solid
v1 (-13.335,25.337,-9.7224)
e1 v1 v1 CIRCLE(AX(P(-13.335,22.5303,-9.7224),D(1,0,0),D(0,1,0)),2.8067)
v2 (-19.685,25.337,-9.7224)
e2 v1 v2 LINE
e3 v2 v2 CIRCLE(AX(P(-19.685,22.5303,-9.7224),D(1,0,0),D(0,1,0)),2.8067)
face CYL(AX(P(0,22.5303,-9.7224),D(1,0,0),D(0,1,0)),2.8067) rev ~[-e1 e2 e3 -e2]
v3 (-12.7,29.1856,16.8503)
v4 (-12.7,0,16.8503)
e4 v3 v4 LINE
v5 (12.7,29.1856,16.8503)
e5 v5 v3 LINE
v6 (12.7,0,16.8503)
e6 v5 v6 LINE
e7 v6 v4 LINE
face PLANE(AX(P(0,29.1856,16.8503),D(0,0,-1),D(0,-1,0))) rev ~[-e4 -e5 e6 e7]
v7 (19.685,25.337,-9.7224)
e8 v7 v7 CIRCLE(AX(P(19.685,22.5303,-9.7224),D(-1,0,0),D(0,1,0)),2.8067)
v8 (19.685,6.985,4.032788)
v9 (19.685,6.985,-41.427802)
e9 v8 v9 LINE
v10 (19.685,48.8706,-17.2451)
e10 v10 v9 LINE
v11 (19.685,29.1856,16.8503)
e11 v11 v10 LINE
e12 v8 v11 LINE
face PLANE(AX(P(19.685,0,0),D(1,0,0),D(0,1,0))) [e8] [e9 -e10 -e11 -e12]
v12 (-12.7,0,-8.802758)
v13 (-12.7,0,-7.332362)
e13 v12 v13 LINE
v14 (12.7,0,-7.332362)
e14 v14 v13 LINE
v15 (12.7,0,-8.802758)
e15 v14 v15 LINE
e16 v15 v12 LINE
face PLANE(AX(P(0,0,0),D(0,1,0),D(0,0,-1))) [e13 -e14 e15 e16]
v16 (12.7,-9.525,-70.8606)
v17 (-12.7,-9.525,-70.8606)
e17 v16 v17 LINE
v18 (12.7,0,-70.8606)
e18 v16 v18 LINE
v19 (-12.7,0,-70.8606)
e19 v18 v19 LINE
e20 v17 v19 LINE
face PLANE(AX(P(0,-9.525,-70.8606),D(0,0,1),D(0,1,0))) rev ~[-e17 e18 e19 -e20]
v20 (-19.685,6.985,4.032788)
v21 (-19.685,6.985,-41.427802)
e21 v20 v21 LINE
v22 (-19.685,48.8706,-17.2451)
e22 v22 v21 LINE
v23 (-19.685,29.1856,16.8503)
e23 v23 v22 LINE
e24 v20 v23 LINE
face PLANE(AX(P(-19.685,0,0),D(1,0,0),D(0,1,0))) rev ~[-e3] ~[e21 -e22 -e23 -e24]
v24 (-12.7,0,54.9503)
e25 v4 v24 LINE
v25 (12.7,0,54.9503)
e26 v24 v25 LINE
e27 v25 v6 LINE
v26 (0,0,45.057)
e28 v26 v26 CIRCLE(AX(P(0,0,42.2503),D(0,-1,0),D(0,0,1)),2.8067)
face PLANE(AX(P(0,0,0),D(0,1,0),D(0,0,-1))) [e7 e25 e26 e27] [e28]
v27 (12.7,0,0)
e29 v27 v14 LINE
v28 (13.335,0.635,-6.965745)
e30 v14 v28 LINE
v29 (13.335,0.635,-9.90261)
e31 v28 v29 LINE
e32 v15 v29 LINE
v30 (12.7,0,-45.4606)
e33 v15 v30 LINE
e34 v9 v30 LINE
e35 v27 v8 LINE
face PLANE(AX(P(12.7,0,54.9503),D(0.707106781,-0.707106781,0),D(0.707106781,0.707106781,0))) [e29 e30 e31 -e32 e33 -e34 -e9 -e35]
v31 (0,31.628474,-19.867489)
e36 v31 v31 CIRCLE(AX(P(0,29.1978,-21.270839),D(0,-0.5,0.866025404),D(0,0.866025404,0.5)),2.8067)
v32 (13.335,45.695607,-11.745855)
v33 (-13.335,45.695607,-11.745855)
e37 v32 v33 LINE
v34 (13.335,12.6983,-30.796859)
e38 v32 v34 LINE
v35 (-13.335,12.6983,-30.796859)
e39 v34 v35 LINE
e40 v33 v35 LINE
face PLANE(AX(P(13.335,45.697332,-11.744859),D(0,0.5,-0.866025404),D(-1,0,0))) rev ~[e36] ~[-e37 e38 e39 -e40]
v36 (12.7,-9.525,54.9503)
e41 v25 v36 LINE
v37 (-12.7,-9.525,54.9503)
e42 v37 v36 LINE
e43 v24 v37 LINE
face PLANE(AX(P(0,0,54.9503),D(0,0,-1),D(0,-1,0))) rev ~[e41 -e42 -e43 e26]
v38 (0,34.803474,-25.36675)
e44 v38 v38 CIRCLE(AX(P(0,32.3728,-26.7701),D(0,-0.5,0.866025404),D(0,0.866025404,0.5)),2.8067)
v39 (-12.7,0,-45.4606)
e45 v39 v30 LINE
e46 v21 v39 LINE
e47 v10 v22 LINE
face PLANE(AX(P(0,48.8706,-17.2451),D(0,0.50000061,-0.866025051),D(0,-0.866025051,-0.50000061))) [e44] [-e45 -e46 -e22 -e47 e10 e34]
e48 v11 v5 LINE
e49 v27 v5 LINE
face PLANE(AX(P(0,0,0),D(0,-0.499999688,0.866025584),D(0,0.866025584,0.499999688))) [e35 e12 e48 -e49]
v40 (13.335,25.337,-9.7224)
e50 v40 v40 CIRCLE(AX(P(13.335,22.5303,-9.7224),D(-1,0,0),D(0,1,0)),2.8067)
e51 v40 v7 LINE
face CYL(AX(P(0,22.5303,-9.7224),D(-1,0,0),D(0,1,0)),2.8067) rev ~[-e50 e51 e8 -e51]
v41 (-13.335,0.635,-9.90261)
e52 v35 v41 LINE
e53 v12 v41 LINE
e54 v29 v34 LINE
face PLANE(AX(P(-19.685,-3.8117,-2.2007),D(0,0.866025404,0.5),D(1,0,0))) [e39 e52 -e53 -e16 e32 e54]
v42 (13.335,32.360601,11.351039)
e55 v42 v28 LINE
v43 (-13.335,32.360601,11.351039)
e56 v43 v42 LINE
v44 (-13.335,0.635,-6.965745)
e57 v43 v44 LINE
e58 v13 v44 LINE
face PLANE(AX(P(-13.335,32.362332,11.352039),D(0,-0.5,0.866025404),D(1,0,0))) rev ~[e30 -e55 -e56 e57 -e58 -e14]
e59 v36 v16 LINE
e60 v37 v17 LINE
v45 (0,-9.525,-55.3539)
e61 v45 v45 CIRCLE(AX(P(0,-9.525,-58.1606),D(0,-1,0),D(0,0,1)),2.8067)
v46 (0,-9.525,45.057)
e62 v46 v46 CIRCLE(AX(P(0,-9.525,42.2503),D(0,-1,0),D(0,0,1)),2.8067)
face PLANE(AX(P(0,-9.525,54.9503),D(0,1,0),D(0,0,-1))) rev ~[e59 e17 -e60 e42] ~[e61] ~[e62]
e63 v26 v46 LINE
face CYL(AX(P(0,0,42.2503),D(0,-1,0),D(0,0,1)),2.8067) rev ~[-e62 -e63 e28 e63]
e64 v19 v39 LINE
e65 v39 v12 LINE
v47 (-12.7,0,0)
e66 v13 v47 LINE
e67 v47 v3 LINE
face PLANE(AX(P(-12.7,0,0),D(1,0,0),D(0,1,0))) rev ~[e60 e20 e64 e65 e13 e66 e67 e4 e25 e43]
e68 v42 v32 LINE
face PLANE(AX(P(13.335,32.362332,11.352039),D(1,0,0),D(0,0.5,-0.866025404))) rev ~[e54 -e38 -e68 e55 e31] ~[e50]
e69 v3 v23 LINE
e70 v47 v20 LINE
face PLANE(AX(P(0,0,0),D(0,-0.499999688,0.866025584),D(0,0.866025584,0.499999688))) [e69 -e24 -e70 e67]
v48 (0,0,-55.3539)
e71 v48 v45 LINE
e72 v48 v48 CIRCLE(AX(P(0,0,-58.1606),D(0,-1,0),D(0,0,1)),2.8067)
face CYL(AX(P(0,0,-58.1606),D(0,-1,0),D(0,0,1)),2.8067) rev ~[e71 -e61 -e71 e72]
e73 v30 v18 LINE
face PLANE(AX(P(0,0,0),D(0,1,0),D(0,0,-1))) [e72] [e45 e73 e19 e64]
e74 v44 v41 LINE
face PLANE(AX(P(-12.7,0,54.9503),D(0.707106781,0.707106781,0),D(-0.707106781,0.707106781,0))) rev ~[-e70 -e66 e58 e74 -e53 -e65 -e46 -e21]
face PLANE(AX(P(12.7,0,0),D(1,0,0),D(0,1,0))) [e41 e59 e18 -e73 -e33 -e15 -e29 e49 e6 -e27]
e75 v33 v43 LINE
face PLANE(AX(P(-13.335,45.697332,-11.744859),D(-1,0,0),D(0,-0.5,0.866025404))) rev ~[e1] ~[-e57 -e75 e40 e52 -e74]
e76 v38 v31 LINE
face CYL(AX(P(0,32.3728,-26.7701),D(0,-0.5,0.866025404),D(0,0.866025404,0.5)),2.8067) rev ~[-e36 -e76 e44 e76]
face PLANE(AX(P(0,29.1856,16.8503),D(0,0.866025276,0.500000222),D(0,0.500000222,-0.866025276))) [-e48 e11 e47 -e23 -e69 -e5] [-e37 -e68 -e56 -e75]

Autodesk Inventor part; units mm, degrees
ref_plane "YZ Plane" through (0, 0, 0) normal (1, 0, 0) x (0, 1, 0)
ref_plane "XZ Plane" through (0, 0, 0) normal (0, 1, 0) x (-1, 0, 0)
ref_plane "XY Plane" through (0, 0, 0) normal (0, 0, 1) x (1, 0, 0)
sketch "Sketch1" plane through (0, 0, 0) normal (1, 0, 0) x (0, 1, 0)
  line L0 (0, 0) -> (29.1856, 16.8503)
  line L1 (29.1856, 16.8503) -> (48.8706, -17.2451)
  line L2 (0, -71.1236) -> (0, 36.9987) projected
  line L3 (48.8706, -17.2451) -> (0, -45.4606)
  line L4 (0, 0) -> (0, -45.4606)
  line L5 (32.9956, 10.2512) -> (0, -8.7988) construction
  dimension "d0" = 39.37
  dimension "d1" = 60
  dimension "d5" = 7.62
  dimension "d6" = 38.1
extrude "Extrusion1" add sketch "Sketch1" along normal mid plane 39.37
sketch "Sketch2" plane through (-19.685, 29.1856, 16.8503) normal (0, 0.8660254, 0.5) x (1, 0, 0)
  line L0 (0, 0) -> (39.37, 0) construction
  line L1 (39.37, 0) -> (39.37, 39.37) construction
  line L2 (0, 0) -> (39.37, 39.37) construction
  line L3 (39.37, 39.37) -> (0, 39.37) construction
  line L4 (0, 39.37) -> (39.37, 0) construction
  line L5 (6.35, 6.35) -> (33.02, 6.35)
  line L6 (33.02, 6.35) -> (33.02, 33.02)
  line L7 (33.02, 33.02) -> (6.35, 33.02)
  line L8 (6.35, 33.02) -> (6.35, 6.35)
  line L9 (6.35, 6.35) -> (33.02, 33.02) construction
  line L10 (33.02, 6.35) -> (6.35, 33.02) construction
  point P0 (19.685, 0)
  point P1 (19.685, 19.685)
  dimension "d7" = 26.67
extrude "Extrusion2" cut sketch "Sketch2" against normal blind 38.1
sketch "Sketch3" plane through (0, 0, 0) normal (1, 0, 0) x (0, 1, 0)
  line L0 (29.1856, 16.8503) -> (0, 0) projected
  line L1 (0, 0) -> (0, -45.4606) projected
  line L2 (0, -45.4606) -> (48.8706, -17.2451) projected
  line L3 (12.7, -30.7959) -> (0, -8.7988) projected
  line L4 (32.3606, 11.351) -> (0, -7.3323) projected
  line L5 (0, 0) -> (0, -45.4606)
  line L6 (29.1856, 16.8503) -> (15.6348, 16.8503) construction
  line L7 (0, 0) -> (29.1856, 16.8503) projected
  line L8 (0, 0) -> (0, 54.9503)
  line L9 (48.8706, -17.2451) -> (0, -45.4606) projected
  line L10 (0, -45.4606) -> (0, -70.8606)
  line L11 (0, -109.2236) -> (0, 87.7987) projected
  line L12 (0, 54.9503) -> (-9.525, 54.9503)
  line L13 (-9.525, 54.9503) -> (-9.525, -70.8606)
  line L14 (-9.525, -70.8606) -> (0, -70.8606)
  point P0 (1.0999, -13.335)
  point P1 (0, -15.24)
  point P2 (0, -8.7988)
  dimension "d10" = 38.1
  dimension "d11" = 25.4
  dimension "d12" = 9.525
  dimension "supportBaseLength" = 125.8109
extrude "Extrusion3" add sketch "Sketch3" along normal mid plane 25.4
sketch "Sketch5" plane through (0, 0, 0) normal (1, 0, 0) x (0, 1, 0)
  line L0 (0, 0) -> (29.1856, 16.8503) projected
  line L1 (0, 54.9503) -> (0, 0) projected
  line L2 (29.1856, 16.8503) -> (48.8706, -17.2451) projected
  line L3 (29.1856, 16.8503) -> (0, 16.8503)
  line L4 (0, 0) -> (29.1856, 16.8503)
extrude "Extrusion5" add sketch "Sketch5" along normal mid plane 25.4
sketch "Sketch4" plane through (0, 0, 0) normal (0, 0, 1) x (1, 0, 0)
  line L0 (19.685, 48.8706) -> (-19.685, 48.8706) projected
  line L1 (19.685, 0) -> (19.685, 48.8706) projected
  line L2 (19.685, 0) -> (12.7, 0) projected
  line L3 (12.7, 0) -> (-12.7, 0) projected
  line L4 (-12.7, 0) -> (-19.685, 0) projected
  line L5 (-19.685, 48.8706) -> (-19.685, 0) projected
  line L6 (-12.7, 0) -> (-12.7, -9.525) projected
  line L7 (12.7, -9.525) -> (-12.7, -9.525) projected
  line L8 (12.7, -9.525) -> (12.7, 0) projected
  line L9 (-12.7, 0) -> (-19.685, 6.985)
  line L10 (-19.685, 48.8706) -> (-19.685, 0) projected
  line L11 (-19.685, 6.985) -> (-19.685, 0)
  line L12 (0, 0) -> (0, 48.8706) construction
  line L13 (12.7, 0) -> (19.685, 0)
  line L14 (12.7, 0) -> (19.685, 6.985)
  line L15 (19.685, 6.985) -> (19.685, 0)
  dimension "d15" = 45
extrude "Extrusion4" cut sketch "Sketch4" against normal up to surface (125.8109 mm away) from surface at 54.9503 contours L1 L2 L14 | L9 L4 L5
sketch "Sketch6" plane through (-12.7, 0, 54.9503) normal (0, 1, 0) x (1, 0, 0)
  line L0 (25.4, 125.8109) -> (0, 125.8109) construction
  line L1 (12.7, 125.8109) -> (12.7, 0) construction
  line L2 (25.4, 0) -> (0, 0) construction
  point P0 (12.7, 54.9503)
  point P1 (12.7, 113.1109)
  point P2 (12.7, 12.7)
  dimension "d21" = 12.7
  dimension "d22" = 12.7
hole "Hole1" at (0, 0, -58.1606) at (0, 0, 42.2503) direction (0, -1, 0) diameter 5.6134 end through all clearance for "Flat Head Machine Screw (82)" size "#10" standard "Ansi Unified Screw Threads"
sketch "Sketch9" plane through (0, 0, 0) normal (1, 0, 0) x (0, 1, 0)
  line L0 (0.635, -6.9657) -> (0.635, -9.8987) projected
  line L1 (0.635, -9.8987) -> (12.7, -30.7959) projected
  line L2 (45.6956, -11.7459) -> (12.7, -30.7959) projected
  line L3 (32.3606, 11.351) -> (45.6956, -11.7459) projected
  line L4 (32.3606, 11.351) -> (0.635, -6.9657) projected
  line L5 (39.0281, -0.1974) -> (6.0325, -19.2474) construction
  line L6 (0.635, -9.8987) -> (12.7, -30.7959) construction
  circle A0 centre (22.5303, -9.7224) radius 2.8067
  point P0 (0, 0)
  dimension "d30" = 5.6134
extrude "Extrusion6" cut sketch "Sketch9" along normal through all both and the other way through all contours A0
sketch "Sketch10" plane through (-19.685, 48.8706, -17.2451) normal (0, 0.5, -0.8660254) x (1, 0, 0)
  line L0 (6.35, 0) -> (33.02, 0) construction
  line L1 (19.685, 0) -> (19.685, 77.7875) construction
  point P0 (19.685, 33.7006)
  point P1 (19.685, 19.05)
  dimension "d33" = 19.05
hole "Hole2" at (0, 32.3728, -26.7701) direction (0, -0.5, 0.8660254) diameter 5.6134 depth 6.35 clearance for "Flat Head Machine Screw (82)" size "#10" standard "Ansi Unified Screw Threads"
equation "\"d0\" = widthToSupportExtrusion"
equation "\"d1\" = attachementAngle"
equation "\"d6\" = insertDepth"
equation "\"d2\" = widthToSupportExtrusion"
equation "\"d7\" = insertForExtrusion"
equation "\"d8\" = insertDepth"
equation "\"d10\" = lenghtUnderBrace"
equation "\"d11\" = backLength"
equation "\"d12\" = supportBaseDepth"
equation "\"d13\" = supportBaseWidth"
equation "\"d19\" = supportBaseWidth"
equation "\"d21\" = supportHoleDistanceFromEnd"
equation "\"d22\" = supportHoleDistanceFromEnd"
equation "\"attachementAngle\" = 60deg"
equation "\"extrusionSize\" = 25.4"
equation "\"wallThickness\" = 6.35"
equation "\"slipClearance\" = 0.635"
equation "\"insertForExtrusion\" = extrusionSize + 2 * slipClearance"
equation "\"widthToSupportExtrusion\" = insertForExtrusion + 2 * wallThickness"
equation "\"insertDepth\" = 38.1"
equation "\"supportBaseWidth\" = 25.4"
equation "\"supportBaseDepth\" = 9.525"
equation "\"supportHoleDistanceFromEnd\" = 12.7"
equation "\"lenghtUnderBrace\" = 38.1"
equation "\"backLength\" = 25.4"
properties part number "60DegreeAttachementV03"
